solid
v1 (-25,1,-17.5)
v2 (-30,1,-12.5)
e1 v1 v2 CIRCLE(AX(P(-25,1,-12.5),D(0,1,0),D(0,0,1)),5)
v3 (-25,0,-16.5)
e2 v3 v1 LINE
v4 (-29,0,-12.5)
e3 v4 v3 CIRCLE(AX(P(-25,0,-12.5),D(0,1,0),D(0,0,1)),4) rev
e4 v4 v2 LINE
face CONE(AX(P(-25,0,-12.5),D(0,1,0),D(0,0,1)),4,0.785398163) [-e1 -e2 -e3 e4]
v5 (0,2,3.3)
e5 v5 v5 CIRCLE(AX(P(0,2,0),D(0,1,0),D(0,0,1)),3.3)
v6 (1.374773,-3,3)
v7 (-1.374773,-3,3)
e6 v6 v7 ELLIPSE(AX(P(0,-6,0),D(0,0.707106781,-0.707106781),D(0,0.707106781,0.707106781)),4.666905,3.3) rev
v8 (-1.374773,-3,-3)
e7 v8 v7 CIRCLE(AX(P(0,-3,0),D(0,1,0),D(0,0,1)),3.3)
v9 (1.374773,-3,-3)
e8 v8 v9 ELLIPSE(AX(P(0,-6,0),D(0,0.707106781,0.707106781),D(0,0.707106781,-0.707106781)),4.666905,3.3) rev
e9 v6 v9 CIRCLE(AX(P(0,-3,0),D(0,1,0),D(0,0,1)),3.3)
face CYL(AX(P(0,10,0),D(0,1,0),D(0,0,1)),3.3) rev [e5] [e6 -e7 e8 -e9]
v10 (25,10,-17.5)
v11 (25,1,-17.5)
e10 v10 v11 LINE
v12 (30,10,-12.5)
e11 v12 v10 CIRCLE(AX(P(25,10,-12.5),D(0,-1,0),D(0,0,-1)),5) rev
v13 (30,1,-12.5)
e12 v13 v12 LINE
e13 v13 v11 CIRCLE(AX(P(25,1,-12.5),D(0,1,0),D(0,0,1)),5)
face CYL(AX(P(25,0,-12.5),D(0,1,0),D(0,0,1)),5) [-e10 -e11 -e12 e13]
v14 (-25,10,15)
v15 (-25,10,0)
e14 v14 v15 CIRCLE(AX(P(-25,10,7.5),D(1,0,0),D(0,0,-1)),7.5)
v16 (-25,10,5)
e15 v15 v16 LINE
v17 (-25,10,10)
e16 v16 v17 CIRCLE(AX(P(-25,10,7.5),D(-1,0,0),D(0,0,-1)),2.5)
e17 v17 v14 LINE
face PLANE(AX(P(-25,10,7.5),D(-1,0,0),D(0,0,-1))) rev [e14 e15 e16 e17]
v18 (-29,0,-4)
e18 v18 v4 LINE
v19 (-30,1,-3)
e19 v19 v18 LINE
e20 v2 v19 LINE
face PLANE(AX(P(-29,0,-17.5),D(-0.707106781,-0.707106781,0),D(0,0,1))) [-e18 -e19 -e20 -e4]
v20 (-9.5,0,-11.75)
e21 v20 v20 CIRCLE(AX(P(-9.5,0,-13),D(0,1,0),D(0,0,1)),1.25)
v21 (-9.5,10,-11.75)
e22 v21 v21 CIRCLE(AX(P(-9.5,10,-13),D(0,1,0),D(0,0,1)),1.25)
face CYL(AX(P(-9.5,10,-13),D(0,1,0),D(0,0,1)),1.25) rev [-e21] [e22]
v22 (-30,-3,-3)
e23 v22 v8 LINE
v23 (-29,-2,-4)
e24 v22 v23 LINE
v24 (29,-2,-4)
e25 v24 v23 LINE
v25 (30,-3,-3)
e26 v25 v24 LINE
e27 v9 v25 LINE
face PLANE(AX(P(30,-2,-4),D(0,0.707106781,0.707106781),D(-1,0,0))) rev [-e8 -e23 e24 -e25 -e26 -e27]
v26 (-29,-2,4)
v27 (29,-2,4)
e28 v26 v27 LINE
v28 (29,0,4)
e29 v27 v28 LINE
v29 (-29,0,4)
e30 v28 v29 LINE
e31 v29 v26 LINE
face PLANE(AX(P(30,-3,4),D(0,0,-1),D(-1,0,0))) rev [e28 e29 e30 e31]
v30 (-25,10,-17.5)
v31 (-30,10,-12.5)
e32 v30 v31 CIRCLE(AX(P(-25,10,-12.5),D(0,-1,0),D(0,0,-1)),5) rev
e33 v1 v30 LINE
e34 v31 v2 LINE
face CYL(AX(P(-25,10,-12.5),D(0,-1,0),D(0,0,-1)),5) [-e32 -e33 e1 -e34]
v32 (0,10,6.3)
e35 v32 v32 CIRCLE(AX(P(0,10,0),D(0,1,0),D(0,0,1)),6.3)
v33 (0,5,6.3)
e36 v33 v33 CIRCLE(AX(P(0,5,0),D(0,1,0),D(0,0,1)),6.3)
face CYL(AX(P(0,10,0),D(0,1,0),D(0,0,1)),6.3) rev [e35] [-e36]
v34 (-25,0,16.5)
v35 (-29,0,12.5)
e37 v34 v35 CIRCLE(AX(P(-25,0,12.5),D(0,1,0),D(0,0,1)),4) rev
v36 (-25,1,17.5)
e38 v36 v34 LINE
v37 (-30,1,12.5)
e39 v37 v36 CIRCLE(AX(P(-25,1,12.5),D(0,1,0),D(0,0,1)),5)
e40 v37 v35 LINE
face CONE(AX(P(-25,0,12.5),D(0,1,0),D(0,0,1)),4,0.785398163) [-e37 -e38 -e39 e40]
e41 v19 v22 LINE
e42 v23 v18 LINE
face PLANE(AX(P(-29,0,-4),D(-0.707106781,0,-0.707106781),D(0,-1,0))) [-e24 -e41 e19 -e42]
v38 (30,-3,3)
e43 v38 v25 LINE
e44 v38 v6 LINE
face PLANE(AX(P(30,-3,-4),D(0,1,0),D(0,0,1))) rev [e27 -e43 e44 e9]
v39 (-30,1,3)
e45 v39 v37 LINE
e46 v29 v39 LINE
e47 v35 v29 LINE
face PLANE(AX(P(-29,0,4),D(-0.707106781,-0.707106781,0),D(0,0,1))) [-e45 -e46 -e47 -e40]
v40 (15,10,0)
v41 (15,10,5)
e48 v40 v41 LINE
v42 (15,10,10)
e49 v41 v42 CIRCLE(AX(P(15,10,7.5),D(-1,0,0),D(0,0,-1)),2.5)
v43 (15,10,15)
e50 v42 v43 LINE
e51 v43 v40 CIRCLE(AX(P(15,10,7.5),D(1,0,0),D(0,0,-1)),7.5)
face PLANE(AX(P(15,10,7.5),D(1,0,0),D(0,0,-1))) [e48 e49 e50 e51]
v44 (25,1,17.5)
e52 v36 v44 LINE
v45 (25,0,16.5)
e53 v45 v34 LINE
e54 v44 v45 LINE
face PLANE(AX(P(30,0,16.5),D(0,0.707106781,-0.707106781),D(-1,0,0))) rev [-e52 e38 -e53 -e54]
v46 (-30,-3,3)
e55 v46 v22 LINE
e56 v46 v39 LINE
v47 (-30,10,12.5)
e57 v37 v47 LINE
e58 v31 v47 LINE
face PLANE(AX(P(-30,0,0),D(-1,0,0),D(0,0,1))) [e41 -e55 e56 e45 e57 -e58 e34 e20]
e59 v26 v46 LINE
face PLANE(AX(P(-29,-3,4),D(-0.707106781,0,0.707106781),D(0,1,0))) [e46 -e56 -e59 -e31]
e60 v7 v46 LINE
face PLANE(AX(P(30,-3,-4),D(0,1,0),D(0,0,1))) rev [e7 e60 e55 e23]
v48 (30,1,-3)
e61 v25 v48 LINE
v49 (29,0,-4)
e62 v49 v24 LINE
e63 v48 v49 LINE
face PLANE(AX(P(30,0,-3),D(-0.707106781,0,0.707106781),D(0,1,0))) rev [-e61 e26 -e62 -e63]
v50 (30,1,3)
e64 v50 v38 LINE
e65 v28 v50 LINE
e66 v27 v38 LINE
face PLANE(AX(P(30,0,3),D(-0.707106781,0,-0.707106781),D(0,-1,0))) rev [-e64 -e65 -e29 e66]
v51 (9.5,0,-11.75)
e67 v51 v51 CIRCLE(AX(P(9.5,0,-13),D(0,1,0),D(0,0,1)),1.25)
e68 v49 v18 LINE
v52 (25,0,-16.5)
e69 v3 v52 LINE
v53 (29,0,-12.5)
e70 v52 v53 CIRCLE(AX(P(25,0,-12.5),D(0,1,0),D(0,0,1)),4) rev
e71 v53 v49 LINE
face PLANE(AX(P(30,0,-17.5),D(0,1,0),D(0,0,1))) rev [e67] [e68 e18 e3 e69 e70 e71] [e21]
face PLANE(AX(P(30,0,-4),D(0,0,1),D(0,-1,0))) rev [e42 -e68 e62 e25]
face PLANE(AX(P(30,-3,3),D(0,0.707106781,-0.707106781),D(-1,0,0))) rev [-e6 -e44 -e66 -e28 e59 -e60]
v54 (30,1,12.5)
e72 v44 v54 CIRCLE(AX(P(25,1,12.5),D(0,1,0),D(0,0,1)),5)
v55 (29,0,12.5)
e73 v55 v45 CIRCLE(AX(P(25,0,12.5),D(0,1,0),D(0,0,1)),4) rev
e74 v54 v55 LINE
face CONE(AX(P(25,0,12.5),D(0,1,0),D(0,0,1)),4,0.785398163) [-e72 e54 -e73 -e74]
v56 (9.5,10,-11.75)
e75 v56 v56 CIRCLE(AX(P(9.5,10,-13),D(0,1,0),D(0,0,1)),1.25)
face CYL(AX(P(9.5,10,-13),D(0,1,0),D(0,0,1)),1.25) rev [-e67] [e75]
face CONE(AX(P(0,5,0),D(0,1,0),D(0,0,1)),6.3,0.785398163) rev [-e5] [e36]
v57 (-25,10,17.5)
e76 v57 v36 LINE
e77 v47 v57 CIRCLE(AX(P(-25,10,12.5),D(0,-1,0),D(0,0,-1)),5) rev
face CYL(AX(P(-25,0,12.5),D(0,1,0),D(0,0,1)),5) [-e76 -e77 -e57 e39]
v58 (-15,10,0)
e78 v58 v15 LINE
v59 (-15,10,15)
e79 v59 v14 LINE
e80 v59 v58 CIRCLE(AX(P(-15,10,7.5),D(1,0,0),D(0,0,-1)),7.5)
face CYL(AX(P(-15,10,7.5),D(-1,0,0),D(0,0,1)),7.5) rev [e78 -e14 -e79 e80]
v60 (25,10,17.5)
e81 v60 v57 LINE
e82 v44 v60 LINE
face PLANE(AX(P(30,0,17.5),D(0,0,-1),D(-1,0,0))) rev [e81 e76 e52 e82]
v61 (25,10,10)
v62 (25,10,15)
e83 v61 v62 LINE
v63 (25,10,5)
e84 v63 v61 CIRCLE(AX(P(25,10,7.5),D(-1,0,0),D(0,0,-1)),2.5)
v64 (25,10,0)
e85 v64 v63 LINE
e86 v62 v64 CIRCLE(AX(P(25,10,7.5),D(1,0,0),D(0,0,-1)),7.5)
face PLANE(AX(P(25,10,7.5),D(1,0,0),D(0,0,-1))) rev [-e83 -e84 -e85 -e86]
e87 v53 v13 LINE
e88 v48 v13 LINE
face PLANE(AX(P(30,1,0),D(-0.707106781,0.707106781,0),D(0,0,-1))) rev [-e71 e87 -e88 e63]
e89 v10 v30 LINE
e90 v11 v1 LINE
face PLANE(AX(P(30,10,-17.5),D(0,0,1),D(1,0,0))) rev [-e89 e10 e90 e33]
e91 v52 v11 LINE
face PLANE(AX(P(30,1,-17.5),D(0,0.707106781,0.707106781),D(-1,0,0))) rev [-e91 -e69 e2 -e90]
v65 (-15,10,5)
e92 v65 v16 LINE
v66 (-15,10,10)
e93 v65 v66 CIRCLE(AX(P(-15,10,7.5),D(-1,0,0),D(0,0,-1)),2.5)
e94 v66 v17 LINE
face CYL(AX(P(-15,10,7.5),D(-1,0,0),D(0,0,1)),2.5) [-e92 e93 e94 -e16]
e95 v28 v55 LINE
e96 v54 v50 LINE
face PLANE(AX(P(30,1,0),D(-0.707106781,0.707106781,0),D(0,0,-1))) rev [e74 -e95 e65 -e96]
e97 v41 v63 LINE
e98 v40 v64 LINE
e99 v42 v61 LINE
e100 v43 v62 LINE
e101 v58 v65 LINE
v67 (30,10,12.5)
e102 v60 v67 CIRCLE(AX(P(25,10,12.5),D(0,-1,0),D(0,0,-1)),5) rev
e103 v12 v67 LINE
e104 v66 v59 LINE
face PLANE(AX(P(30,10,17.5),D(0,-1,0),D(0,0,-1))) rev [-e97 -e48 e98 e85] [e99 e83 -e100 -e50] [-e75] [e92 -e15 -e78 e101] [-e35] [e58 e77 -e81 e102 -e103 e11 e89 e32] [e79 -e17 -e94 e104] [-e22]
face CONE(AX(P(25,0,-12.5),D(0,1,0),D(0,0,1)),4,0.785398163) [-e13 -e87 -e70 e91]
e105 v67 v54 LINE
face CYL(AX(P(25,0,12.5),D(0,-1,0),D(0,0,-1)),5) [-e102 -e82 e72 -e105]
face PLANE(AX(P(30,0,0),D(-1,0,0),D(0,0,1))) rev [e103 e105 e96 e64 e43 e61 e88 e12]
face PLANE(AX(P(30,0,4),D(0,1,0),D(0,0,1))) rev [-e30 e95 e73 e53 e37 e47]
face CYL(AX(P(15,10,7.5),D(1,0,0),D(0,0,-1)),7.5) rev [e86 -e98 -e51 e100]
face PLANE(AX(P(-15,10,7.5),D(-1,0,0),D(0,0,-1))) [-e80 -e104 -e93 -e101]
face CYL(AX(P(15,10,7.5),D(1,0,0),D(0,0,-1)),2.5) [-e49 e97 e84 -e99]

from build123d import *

# Parameters (mm, degrees)
BOSS_EXTRUDE1_DEPTH   = 30
CUT_EXTRUDE1_DEPTH    = 5
FILLET1_R             = 5
CHAMFER1_SIZE         = 1
M3X0_5_TAPPED_HOLE1_D = 2.5


with BuildPart() as part:
    # Sketch1 → Boss-Extrude1 (new, symmetric)
    with BuildSketch(Plane(origin=(0, 0, 0), x_dir=(0, 0, -1), z_dir=(1, 0, 0))):
        Polygon((-17.5, 10), (17.5, 10), (17.5, 0), (4, 0), (4, -3), (-4, -3), (-4, 0), (-17.5, 0), align=None)
    extrude(amount=BOSS_EXTRUDE1_DEPTH, both=True)

    # Sketch3 → CSK for M6 Flat Head Machine Screw1 (revolve, cut)
    with BuildSketch(Plane(origin=(0, 10, 0), x_dir=(0, 0, 1), z_dir=(1, 0, 0))):
        Polygon((0, 0), (0, 13), (3.3, 13), (3.3, 8), (6.3, 5), (6.3, 0), align=None)
    revolve(axis=Axis((0, 16.35, 0), (0, -1, 0)), mode=Mode.SUBTRACT)

    # Sketch4 → Cut-Extrude1 (cut, symmetric)
    with BuildSketch(Plane(origin=(20, 0, 0), x_dir=(0, 0, -1), z_dir=(1, 0, 0))):
        with BuildLine():
            Line((-15, 10), (-10, 10))
            ThreePointArc((-10, 10), (-7.5, 7.5), (-5, 10))
            Line((-5, 10), (0, 10))
            ThreePointArc((0, 10), (-7.5, 2.5), (-15, 10))
        make_face()
    cut_extrude1 = extrude(amount=CUT_EXTRUDE1_DEPTH, both=True, mode=Mode.SUBTRACT)

    # Mirror1: Cut-Extrude1 across plane
    add(cut_extrude1.mirror(Plane(origin=(0, 0, 0), x_dir=(0, 0, 1), z_dir=(1, 0, 0))), mode=Mode.SUBTRACT)

    # Fillet1
    fillet1_edges = [part.edges().sort_by_distance(p)[0] for p in [
        (-30, 5, 17.5),
        (30, 5, -17.5),
        (30, 5, 17.5),
        (-30, 5, -17.5),
    ]]
    fillet(fillet1_edges, radius=FILLET1_R)

    # Chamfer1
    # the kernel refuses this chamfer: 1 mm, written as the material it takes off along each edge
    with BuildSketch(Plane(origin=(-30, -5.571682988, 4), x_dir=(-0.027495876610585623, 0, -0.9996219169112968), z_dir=(0, 1, 0)), Plane(origin=(-30, 0, -4), x_dir=(-0.027495876610585623, 0, 0.9996219169112968), z_dir=(0, -1, 0))) as chamfer1_piece_1:
        Polygon((CHAMFER1_SIZE * 0.999621916911, -CHAMFER1_SIZE * 0.0274958766106), (-CHAMFER1_SIZE * 0.0274958766106, -CHAMFER1_SIZE * 0.999621916911), (0, 0), align=None)
    extrude(amount=5.571682988, mode=Mode.SUBTRACT)
    with BuildSketch(Plane(origin=(30, -5.571682988, 4), x_dir=(0.027495876610585623, 0, -0.9996219169112968), z_dir=(0, 1, 0)), Plane(origin=(30, 0, -4), x_dir=(0.027495876610585623, 0, 0.9996219169112968), z_dir=(0, -1, 0))) as chamfer1_piece_2:
        Polygon((CHAMFER1_SIZE * 0.999621916911, CHAMFER1_SIZE * 0.0274958766106), (-CHAMFER1_SIZE * 0.0274958766106, CHAMFER1_SIZE * 0.999621916911), (0, 0), align=None)
    extrude(amount=5.571682988, mode=Mode.SUBTRACT)
    with BuildSketch(Plane(origin=(32.571682988, -3, -4), x_dir=(0, 0.9996219169112968, -0.027495876610586494), z_dir=(-1, 0, 0))) as chamfer1_piece_3:
        Polygon((CHAMFER1_SIZE * 0.999621916911, -CHAMFER1_SIZE * 0.0274958766106), (-CHAMFER1_SIZE * 0.0274958766106, -CHAMFER1_SIZE * 0.999621916911), (0, 0), align=None)
    extrude(amount=65.143365976, mode=Mode.SUBTRACT)
    with BuildSketch(Plane(origin=(32.571682988, -3, 4), x_dir=(0, 0.9996219169112968, 0.027495876610586494), z_dir=(-1, 0, 0))) as chamfer1_piece_4:
        Polygon((CHAMFER1_SIZE * 0.999621916911, CHAMFER1_SIZE * 0.0274958766106), (-CHAMFER1_SIZE * 0.0274958766106, CHAMFER1_SIZE * 0.999621916911), (0, 0), align=None)
    extrude(amount=65.143365976, mode=Mode.SUBTRACT)
    with BuildSketch(Plane(origin=(30, 0, -12.5), x_dir=(0.027495876610585623, 0.9996219169112968, 0), z_dir=(0, 0, 1)), Plane(origin=(30, 0, 4), x_dir=(0.02749587661058563, 0.9996219169112968, 0), z_dir=(0, 0, 1))) as chamfer1_piece_5:
        Polygon((CHAMFER1_SIZE * 0.999621916911, CHAMFER1_SIZE * 0.0274958766106), (-CHAMFER1_SIZE * 0.0274958766106, CHAMFER1_SIZE * 0.999621916911), (0, 0), align=None)
    extrude(amount=8.5, mode=Mode.SUBTRACT)
    with BuildSketch(Plane(origin=(-30, 0, 4), x_dir=(-0.02749587661058563, 0.9996219169112968, 0), z_dir=(0, 0, 1)), Plane(origin=(-30, 0, -12.5), x_dir=(-0.027495876610585623, 0.9996219169112968, 0), z_dir=(0, 0, 1))) as chamfer1_piece_6:
        Polygon((CHAMFER1_SIZE * 0.999621916911, -CHAMFER1_SIZE * 0.0274958766106), (-CHAMFER1_SIZE * 0.0274958766106, -CHAMFER1_SIZE * 0.999621916911), (0, 0), align=None)
    extrude(amount=8.5, mode=Mode.SUBTRACT)
    with BuildSketch(Plane(origin=(-25, 0, 17.5), x_dir=(0, 0.9996219169112968, 0.02749587661058563), z_dir=(1, 0, 0)), Plane(origin=(25, 0, -17.5), x_dir=(0, 0.9996219169112968, -0.027495876610585623), z_dir=(-1, 0, 0))) as chamfer1_piece_7:
        Polygon((CHAMFER1_SIZE * 0.999621916911, -CHAMFER1_SIZE * 0.0274958766106), (-CHAMFER1_SIZE * 0.0274958766106, -CHAMFER1_SIZE * 0.999621916911), (0, 0), align=None)
    extrude(amount=50, mode=Mode.SUBTRACT)
    with BuildSketch(Plane(origin=(-25, 0, 12.5), x_dir=(0, 0, 1), z_dir=(1, 0, 0))) as chamfer1_piece_8:
        Polygon((5, -CHAMFER1_SIZE), (5 - CHAMFER1_SIZE, 0), (5, 0), align=None)
    revolve(axis=Axis((-25, 0, 12.5), (0, -1, 0)), revolution_arc=90, mode=Mode.SUBTRACT)
    with BuildSketch(Plane(origin=(25, 0, 12.5), x_dir=(0, 0, 1), z_dir=(-1, 0, 0))) as chamfer1_piece_9:
        Polygon((5, CHAMFER1_SIZE), (5 - CHAMFER1_SIZE, 0), (5, 0), align=None)
    revolve(axis=Axis((25, 0, 12.5), (0, 1, 0)), revolution_arc=90, mode=Mode.SUBTRACT)
    with BuildSketch(Plane(origin=(-25, 0, -12.5), x_dir=(-1, 0, 0), z_dir=(0, 0, 1))) as chamfer1_piece_10:
        Polygon((5, -CHAMFER1_SIZE), (5 - CHAMFER1_SIZE, 0), (5, 0), align=None)
    revolve(axis=Axis((-25, 0, -12.5), (0, -1, 0)), revolution_arc=90, mode=Mode.SUBTRACT)
    with BuildSketch(Plane(origin=(25, 0, -12.5), x_dir=(1, 0, 0), z_dir=(0, 0, 1))) as chamfer1_piece_11:
        Polygon((5, CHAMFER1_SIZE), (5 - CHAMFER1_SIZE, 0), (5, 0), align=None)
    revolve(axis=Axis((25, 0, -12.5), (0, 1, 0)), revolution_arc=90, mode=Mode.SUBTRACT)
    with BuildSketch(Plane(origin=(-30, 0, 1.428317012), x_dir=(-0.02749587661058563, 0.9996219169112968, 0), z_dir=(0, 0, 1))) as chamfer1_piece_12a_section:
        Polygon((CHAMFER1_SIZE * 0.999621916911, -CHAMFER1_SIZE * 0.0274958766106), (-CHAMFER1_SIZE * 0.0274958766106, -CHAMFER1_SIZE * 0.999621916911), (0, 0), align=None)
    chamfer1_piece_12a = extrude(amount=11.071682988, mode=Mode.PRIVATE)
    chamfer1_piece_12a = split(chamfer1_piece_12a, bisect_by=Plane(origin=(-29.670206373, 0.329793627, 4), z_dir=(0, 0, -1)), keep=Keep.TOP, mode=Mode.PRIVATE)
    with BuildSketch(Plane(origin=(-30, -5.571682988, 4), x_dir=(-0.027495876610585623, 0, -0.9996219169112968), z_dir=(0, 1, 0))) as chamfer1_piece_12b_section:
        Polygon((CHAMFER1_SIZE * 0.999621916911, -CHAMFER1_SIZE * 0.0274958766106), (-CHAMFER1_SIZE * 0.0274958766106, -CHAMFER1_SIZE * 0.999621916911), (0, 0), align=None)
    chamfer1_piece_12b = extrude(amount=8.143365976, mode=Mode.PRIVATE)
    chamfer1_piece_12b = split(chamfer1_piece_12b, bisect_by=Plane(origin=(-29.670206373, 0, 3.670206373), z_dir=(0, 1, 0)), keep=Keep.TOP, mode=Mode.PRIVATE)
    chamfer1_piece_12 = chamfer1_piece_12a & chamfer1_piece_12b
    add(chamfer1_piece_12, mode=Mode.SUBTRACT)
    with BuildSketch(Plane(origin=(30, 0, 1.428317012), x_dir=(0.02749587661058563, 0.9996219169112968, 0), z_dir=(0, 0, 1))) as chamfer1_piece_13a_section:
        Polygon((CHAMFER1_SIZE * 0.999621916911, CHAMFER1_SIZE * 0.0274958766106), (-CHAMFER1_SIZE * 0.0274958766106, CHAMFER1_SIZE * 0.999621916911), (0, 0), align=None)
    chamfer1_piece_13a = extrude(amount=11.071682988, mode=Mode.PRIVATE)
    chamfer1_piece_13a = split(chamfer1_piece_13a, bisect_by=Plane(origin=(29.670206373, 0.329793627, 4), z_dir=(0, 0, -1)), keep=Keep.TOP, mode=Mode.PRIVATE)
    with BuildSketch(Plane(origin=(30, -5.571682988, 4), x_dir=(0.027495876610585623, 0, -0.9996219169112968), z_dir=(0, 1, 0))) as chamfer1_piece_13b_section:
        Polygon((CHAMFER1_SIZE * 0.999621916911, CHAMFER1_SIZE * 0.0274958766106), (-CHAMFER1_SIZE * 0.0274958766106, CHAMFER1_SIZE * 0.999621916911), (0, 0), align=None)
    chamfer1_piece_13b = extrude(amount=8.143365976, mode=Mode.PRIVATE)
    chamfer1_piece_13b = split(chamfer1_piece_13b, bisect_by=Plane(origin=(29.670206373, 0, 3.670206373), z_dir=(0, 1, 0)), keep=Keep.TOP, mode=Mode.PRIVATE)
    chamfer1_piece_13 = chamfer1_piece_13a & chamfer1_piece_13b
    add(chamfer1_piece_13, mode=Mode.SUBTRACT)
    with BuildSketch(Plane(origin=(30, 0, -12.5), x_dir=(0.027495876610585623, 0.9996219169112968, 0), z_dir=(0, 0, 1))) as chamfer1_piece_14a_section:
        Polygon((CHAMFER1_SIZE * 0.999621916911, CHAMFER1_SIZE * 0.0274958766106), (-CHAMFER1_SIZE * 0.0274958766106, CHAMFER1_SIZE * 0.999621916911), (0, 0), align=None)
    chamfer1_piece_14a = extrude(amount=11.071682988, mode=Mode.PRIVATE)
    chamfer1_piece_14a = split(chamfer1_piece_14a, bisect_by=Plane(origin=(29.670206373, 0.329793627, -4), z_dir=(0, 0, 1)), keep=Keep.TOP, mode=Mode.PRIVATE)
    with BuildSketch(Plane(origin=(30, 2.571682988, -4), x_dir=(0.027495876610585623, 0, 0.9996219169112968), z_dir=(0, -1, 0))) as chamfer1_piece_14b_section:
        Polygon((CHAMFER1_SIZE * 0.999621916911, CHAMFER1_SIZE * 0.0274958766106), (-CHAMFER1_SIZE * 0.0274958766106, CHAMFER1_SIZE * 0.999621916911), (0, 0), align=None)
    chamfer1_piece_14b = extrude(amount=8.143365976, mode=Mode.PRIVATE)
    chamfer1_piece_14b = split(chamfer1_piece_14b, bisect_by=Plane(origin=(29.670206373, 0, -3.670206373), z_dir=(0, 1, 0)), keep=Keep.TOP, mode=Mode.PRIVATE)
    chamfer1_piece_14 = chamfer1_piece_14a & chamfer1_piece_14b
    add(chamfer1_piece_14, mode=Mode.SUBTRACT)
    with BuildSketch(Plane(origin=(-30, 0, -12.5), x_dir=(-0.027495876610585623, 0.9996219169112968, 0), z_dir=(0, 0, 1))) as chamfer1_piece_15a_section:
        Polygon((CHAMFER1_SIZE * 0.999621916911, -CHAMFER1_SIZE * 0.0274958766106), (-CHAMFER1_SIZE * 0.0274958766106, -CHAMFER1_SIZE * 0.999621916911), (0, 0), align=None)
    chamfer1_piece_15a = extrude(amount=11.071682988, mode=Mode.PRIVATE)
    chamfer1_piece_15a = split(chamfer1_piece_15a, bisect_by=Plane(origin=(-29.670206373, 0.329793627, -4), z_dir=(0, 0, 1)), keep=Keep.TOP, mode=Mode.PRIVATE)
    with BuildSketch(Plane(origin=(-30, 2.571682988, -4), x_dir=(-0.027495876610585623, 0, 0.9996219169112968), z_dir=(0, -1, 0))) as chamfer1_piece_15b_section:
        Polygon((CHAMFER1_SIZE * 0.999621916911, -CHAMFER1_SIZE * 0.0274958766106), (-CHAMFER1_SIZE * 0.0274958766106, -CHAMFER1_SIZE * 0.999621916911), (0, 0), align=None)
    chamfer1_piece_15b = extrude(amount=8.143365976, mode=Mode.PRIVATE)
    chamfer1_piece_15b = split(chamfer1_piece_15b, bisect_by=Plane(origin=(-29.670206373, 0, -3.670206373), z_dir=(0, 1, 0)), keep=Keep.TOP, mode=Mode.PRIVATE)
    chamfer1_piece_15 = chamfer1_piece_15a & chamfer1_piece_15b
    add(chamfer1_piece_15, mode=Mode.SUBTRACT)

    # M3x0.5 Tapped Hole1 (through all)
    with Locations(Plane(origin=(0, 10, 0), x_dir=(1, 0, 0), z_dir=(0, 1, 0))):
        with Locations((-9.5, 13), (9.5, 13)):
            Hole(M3X0_5_TAPPED_HOLE1_D / 2)


solid = part.part
